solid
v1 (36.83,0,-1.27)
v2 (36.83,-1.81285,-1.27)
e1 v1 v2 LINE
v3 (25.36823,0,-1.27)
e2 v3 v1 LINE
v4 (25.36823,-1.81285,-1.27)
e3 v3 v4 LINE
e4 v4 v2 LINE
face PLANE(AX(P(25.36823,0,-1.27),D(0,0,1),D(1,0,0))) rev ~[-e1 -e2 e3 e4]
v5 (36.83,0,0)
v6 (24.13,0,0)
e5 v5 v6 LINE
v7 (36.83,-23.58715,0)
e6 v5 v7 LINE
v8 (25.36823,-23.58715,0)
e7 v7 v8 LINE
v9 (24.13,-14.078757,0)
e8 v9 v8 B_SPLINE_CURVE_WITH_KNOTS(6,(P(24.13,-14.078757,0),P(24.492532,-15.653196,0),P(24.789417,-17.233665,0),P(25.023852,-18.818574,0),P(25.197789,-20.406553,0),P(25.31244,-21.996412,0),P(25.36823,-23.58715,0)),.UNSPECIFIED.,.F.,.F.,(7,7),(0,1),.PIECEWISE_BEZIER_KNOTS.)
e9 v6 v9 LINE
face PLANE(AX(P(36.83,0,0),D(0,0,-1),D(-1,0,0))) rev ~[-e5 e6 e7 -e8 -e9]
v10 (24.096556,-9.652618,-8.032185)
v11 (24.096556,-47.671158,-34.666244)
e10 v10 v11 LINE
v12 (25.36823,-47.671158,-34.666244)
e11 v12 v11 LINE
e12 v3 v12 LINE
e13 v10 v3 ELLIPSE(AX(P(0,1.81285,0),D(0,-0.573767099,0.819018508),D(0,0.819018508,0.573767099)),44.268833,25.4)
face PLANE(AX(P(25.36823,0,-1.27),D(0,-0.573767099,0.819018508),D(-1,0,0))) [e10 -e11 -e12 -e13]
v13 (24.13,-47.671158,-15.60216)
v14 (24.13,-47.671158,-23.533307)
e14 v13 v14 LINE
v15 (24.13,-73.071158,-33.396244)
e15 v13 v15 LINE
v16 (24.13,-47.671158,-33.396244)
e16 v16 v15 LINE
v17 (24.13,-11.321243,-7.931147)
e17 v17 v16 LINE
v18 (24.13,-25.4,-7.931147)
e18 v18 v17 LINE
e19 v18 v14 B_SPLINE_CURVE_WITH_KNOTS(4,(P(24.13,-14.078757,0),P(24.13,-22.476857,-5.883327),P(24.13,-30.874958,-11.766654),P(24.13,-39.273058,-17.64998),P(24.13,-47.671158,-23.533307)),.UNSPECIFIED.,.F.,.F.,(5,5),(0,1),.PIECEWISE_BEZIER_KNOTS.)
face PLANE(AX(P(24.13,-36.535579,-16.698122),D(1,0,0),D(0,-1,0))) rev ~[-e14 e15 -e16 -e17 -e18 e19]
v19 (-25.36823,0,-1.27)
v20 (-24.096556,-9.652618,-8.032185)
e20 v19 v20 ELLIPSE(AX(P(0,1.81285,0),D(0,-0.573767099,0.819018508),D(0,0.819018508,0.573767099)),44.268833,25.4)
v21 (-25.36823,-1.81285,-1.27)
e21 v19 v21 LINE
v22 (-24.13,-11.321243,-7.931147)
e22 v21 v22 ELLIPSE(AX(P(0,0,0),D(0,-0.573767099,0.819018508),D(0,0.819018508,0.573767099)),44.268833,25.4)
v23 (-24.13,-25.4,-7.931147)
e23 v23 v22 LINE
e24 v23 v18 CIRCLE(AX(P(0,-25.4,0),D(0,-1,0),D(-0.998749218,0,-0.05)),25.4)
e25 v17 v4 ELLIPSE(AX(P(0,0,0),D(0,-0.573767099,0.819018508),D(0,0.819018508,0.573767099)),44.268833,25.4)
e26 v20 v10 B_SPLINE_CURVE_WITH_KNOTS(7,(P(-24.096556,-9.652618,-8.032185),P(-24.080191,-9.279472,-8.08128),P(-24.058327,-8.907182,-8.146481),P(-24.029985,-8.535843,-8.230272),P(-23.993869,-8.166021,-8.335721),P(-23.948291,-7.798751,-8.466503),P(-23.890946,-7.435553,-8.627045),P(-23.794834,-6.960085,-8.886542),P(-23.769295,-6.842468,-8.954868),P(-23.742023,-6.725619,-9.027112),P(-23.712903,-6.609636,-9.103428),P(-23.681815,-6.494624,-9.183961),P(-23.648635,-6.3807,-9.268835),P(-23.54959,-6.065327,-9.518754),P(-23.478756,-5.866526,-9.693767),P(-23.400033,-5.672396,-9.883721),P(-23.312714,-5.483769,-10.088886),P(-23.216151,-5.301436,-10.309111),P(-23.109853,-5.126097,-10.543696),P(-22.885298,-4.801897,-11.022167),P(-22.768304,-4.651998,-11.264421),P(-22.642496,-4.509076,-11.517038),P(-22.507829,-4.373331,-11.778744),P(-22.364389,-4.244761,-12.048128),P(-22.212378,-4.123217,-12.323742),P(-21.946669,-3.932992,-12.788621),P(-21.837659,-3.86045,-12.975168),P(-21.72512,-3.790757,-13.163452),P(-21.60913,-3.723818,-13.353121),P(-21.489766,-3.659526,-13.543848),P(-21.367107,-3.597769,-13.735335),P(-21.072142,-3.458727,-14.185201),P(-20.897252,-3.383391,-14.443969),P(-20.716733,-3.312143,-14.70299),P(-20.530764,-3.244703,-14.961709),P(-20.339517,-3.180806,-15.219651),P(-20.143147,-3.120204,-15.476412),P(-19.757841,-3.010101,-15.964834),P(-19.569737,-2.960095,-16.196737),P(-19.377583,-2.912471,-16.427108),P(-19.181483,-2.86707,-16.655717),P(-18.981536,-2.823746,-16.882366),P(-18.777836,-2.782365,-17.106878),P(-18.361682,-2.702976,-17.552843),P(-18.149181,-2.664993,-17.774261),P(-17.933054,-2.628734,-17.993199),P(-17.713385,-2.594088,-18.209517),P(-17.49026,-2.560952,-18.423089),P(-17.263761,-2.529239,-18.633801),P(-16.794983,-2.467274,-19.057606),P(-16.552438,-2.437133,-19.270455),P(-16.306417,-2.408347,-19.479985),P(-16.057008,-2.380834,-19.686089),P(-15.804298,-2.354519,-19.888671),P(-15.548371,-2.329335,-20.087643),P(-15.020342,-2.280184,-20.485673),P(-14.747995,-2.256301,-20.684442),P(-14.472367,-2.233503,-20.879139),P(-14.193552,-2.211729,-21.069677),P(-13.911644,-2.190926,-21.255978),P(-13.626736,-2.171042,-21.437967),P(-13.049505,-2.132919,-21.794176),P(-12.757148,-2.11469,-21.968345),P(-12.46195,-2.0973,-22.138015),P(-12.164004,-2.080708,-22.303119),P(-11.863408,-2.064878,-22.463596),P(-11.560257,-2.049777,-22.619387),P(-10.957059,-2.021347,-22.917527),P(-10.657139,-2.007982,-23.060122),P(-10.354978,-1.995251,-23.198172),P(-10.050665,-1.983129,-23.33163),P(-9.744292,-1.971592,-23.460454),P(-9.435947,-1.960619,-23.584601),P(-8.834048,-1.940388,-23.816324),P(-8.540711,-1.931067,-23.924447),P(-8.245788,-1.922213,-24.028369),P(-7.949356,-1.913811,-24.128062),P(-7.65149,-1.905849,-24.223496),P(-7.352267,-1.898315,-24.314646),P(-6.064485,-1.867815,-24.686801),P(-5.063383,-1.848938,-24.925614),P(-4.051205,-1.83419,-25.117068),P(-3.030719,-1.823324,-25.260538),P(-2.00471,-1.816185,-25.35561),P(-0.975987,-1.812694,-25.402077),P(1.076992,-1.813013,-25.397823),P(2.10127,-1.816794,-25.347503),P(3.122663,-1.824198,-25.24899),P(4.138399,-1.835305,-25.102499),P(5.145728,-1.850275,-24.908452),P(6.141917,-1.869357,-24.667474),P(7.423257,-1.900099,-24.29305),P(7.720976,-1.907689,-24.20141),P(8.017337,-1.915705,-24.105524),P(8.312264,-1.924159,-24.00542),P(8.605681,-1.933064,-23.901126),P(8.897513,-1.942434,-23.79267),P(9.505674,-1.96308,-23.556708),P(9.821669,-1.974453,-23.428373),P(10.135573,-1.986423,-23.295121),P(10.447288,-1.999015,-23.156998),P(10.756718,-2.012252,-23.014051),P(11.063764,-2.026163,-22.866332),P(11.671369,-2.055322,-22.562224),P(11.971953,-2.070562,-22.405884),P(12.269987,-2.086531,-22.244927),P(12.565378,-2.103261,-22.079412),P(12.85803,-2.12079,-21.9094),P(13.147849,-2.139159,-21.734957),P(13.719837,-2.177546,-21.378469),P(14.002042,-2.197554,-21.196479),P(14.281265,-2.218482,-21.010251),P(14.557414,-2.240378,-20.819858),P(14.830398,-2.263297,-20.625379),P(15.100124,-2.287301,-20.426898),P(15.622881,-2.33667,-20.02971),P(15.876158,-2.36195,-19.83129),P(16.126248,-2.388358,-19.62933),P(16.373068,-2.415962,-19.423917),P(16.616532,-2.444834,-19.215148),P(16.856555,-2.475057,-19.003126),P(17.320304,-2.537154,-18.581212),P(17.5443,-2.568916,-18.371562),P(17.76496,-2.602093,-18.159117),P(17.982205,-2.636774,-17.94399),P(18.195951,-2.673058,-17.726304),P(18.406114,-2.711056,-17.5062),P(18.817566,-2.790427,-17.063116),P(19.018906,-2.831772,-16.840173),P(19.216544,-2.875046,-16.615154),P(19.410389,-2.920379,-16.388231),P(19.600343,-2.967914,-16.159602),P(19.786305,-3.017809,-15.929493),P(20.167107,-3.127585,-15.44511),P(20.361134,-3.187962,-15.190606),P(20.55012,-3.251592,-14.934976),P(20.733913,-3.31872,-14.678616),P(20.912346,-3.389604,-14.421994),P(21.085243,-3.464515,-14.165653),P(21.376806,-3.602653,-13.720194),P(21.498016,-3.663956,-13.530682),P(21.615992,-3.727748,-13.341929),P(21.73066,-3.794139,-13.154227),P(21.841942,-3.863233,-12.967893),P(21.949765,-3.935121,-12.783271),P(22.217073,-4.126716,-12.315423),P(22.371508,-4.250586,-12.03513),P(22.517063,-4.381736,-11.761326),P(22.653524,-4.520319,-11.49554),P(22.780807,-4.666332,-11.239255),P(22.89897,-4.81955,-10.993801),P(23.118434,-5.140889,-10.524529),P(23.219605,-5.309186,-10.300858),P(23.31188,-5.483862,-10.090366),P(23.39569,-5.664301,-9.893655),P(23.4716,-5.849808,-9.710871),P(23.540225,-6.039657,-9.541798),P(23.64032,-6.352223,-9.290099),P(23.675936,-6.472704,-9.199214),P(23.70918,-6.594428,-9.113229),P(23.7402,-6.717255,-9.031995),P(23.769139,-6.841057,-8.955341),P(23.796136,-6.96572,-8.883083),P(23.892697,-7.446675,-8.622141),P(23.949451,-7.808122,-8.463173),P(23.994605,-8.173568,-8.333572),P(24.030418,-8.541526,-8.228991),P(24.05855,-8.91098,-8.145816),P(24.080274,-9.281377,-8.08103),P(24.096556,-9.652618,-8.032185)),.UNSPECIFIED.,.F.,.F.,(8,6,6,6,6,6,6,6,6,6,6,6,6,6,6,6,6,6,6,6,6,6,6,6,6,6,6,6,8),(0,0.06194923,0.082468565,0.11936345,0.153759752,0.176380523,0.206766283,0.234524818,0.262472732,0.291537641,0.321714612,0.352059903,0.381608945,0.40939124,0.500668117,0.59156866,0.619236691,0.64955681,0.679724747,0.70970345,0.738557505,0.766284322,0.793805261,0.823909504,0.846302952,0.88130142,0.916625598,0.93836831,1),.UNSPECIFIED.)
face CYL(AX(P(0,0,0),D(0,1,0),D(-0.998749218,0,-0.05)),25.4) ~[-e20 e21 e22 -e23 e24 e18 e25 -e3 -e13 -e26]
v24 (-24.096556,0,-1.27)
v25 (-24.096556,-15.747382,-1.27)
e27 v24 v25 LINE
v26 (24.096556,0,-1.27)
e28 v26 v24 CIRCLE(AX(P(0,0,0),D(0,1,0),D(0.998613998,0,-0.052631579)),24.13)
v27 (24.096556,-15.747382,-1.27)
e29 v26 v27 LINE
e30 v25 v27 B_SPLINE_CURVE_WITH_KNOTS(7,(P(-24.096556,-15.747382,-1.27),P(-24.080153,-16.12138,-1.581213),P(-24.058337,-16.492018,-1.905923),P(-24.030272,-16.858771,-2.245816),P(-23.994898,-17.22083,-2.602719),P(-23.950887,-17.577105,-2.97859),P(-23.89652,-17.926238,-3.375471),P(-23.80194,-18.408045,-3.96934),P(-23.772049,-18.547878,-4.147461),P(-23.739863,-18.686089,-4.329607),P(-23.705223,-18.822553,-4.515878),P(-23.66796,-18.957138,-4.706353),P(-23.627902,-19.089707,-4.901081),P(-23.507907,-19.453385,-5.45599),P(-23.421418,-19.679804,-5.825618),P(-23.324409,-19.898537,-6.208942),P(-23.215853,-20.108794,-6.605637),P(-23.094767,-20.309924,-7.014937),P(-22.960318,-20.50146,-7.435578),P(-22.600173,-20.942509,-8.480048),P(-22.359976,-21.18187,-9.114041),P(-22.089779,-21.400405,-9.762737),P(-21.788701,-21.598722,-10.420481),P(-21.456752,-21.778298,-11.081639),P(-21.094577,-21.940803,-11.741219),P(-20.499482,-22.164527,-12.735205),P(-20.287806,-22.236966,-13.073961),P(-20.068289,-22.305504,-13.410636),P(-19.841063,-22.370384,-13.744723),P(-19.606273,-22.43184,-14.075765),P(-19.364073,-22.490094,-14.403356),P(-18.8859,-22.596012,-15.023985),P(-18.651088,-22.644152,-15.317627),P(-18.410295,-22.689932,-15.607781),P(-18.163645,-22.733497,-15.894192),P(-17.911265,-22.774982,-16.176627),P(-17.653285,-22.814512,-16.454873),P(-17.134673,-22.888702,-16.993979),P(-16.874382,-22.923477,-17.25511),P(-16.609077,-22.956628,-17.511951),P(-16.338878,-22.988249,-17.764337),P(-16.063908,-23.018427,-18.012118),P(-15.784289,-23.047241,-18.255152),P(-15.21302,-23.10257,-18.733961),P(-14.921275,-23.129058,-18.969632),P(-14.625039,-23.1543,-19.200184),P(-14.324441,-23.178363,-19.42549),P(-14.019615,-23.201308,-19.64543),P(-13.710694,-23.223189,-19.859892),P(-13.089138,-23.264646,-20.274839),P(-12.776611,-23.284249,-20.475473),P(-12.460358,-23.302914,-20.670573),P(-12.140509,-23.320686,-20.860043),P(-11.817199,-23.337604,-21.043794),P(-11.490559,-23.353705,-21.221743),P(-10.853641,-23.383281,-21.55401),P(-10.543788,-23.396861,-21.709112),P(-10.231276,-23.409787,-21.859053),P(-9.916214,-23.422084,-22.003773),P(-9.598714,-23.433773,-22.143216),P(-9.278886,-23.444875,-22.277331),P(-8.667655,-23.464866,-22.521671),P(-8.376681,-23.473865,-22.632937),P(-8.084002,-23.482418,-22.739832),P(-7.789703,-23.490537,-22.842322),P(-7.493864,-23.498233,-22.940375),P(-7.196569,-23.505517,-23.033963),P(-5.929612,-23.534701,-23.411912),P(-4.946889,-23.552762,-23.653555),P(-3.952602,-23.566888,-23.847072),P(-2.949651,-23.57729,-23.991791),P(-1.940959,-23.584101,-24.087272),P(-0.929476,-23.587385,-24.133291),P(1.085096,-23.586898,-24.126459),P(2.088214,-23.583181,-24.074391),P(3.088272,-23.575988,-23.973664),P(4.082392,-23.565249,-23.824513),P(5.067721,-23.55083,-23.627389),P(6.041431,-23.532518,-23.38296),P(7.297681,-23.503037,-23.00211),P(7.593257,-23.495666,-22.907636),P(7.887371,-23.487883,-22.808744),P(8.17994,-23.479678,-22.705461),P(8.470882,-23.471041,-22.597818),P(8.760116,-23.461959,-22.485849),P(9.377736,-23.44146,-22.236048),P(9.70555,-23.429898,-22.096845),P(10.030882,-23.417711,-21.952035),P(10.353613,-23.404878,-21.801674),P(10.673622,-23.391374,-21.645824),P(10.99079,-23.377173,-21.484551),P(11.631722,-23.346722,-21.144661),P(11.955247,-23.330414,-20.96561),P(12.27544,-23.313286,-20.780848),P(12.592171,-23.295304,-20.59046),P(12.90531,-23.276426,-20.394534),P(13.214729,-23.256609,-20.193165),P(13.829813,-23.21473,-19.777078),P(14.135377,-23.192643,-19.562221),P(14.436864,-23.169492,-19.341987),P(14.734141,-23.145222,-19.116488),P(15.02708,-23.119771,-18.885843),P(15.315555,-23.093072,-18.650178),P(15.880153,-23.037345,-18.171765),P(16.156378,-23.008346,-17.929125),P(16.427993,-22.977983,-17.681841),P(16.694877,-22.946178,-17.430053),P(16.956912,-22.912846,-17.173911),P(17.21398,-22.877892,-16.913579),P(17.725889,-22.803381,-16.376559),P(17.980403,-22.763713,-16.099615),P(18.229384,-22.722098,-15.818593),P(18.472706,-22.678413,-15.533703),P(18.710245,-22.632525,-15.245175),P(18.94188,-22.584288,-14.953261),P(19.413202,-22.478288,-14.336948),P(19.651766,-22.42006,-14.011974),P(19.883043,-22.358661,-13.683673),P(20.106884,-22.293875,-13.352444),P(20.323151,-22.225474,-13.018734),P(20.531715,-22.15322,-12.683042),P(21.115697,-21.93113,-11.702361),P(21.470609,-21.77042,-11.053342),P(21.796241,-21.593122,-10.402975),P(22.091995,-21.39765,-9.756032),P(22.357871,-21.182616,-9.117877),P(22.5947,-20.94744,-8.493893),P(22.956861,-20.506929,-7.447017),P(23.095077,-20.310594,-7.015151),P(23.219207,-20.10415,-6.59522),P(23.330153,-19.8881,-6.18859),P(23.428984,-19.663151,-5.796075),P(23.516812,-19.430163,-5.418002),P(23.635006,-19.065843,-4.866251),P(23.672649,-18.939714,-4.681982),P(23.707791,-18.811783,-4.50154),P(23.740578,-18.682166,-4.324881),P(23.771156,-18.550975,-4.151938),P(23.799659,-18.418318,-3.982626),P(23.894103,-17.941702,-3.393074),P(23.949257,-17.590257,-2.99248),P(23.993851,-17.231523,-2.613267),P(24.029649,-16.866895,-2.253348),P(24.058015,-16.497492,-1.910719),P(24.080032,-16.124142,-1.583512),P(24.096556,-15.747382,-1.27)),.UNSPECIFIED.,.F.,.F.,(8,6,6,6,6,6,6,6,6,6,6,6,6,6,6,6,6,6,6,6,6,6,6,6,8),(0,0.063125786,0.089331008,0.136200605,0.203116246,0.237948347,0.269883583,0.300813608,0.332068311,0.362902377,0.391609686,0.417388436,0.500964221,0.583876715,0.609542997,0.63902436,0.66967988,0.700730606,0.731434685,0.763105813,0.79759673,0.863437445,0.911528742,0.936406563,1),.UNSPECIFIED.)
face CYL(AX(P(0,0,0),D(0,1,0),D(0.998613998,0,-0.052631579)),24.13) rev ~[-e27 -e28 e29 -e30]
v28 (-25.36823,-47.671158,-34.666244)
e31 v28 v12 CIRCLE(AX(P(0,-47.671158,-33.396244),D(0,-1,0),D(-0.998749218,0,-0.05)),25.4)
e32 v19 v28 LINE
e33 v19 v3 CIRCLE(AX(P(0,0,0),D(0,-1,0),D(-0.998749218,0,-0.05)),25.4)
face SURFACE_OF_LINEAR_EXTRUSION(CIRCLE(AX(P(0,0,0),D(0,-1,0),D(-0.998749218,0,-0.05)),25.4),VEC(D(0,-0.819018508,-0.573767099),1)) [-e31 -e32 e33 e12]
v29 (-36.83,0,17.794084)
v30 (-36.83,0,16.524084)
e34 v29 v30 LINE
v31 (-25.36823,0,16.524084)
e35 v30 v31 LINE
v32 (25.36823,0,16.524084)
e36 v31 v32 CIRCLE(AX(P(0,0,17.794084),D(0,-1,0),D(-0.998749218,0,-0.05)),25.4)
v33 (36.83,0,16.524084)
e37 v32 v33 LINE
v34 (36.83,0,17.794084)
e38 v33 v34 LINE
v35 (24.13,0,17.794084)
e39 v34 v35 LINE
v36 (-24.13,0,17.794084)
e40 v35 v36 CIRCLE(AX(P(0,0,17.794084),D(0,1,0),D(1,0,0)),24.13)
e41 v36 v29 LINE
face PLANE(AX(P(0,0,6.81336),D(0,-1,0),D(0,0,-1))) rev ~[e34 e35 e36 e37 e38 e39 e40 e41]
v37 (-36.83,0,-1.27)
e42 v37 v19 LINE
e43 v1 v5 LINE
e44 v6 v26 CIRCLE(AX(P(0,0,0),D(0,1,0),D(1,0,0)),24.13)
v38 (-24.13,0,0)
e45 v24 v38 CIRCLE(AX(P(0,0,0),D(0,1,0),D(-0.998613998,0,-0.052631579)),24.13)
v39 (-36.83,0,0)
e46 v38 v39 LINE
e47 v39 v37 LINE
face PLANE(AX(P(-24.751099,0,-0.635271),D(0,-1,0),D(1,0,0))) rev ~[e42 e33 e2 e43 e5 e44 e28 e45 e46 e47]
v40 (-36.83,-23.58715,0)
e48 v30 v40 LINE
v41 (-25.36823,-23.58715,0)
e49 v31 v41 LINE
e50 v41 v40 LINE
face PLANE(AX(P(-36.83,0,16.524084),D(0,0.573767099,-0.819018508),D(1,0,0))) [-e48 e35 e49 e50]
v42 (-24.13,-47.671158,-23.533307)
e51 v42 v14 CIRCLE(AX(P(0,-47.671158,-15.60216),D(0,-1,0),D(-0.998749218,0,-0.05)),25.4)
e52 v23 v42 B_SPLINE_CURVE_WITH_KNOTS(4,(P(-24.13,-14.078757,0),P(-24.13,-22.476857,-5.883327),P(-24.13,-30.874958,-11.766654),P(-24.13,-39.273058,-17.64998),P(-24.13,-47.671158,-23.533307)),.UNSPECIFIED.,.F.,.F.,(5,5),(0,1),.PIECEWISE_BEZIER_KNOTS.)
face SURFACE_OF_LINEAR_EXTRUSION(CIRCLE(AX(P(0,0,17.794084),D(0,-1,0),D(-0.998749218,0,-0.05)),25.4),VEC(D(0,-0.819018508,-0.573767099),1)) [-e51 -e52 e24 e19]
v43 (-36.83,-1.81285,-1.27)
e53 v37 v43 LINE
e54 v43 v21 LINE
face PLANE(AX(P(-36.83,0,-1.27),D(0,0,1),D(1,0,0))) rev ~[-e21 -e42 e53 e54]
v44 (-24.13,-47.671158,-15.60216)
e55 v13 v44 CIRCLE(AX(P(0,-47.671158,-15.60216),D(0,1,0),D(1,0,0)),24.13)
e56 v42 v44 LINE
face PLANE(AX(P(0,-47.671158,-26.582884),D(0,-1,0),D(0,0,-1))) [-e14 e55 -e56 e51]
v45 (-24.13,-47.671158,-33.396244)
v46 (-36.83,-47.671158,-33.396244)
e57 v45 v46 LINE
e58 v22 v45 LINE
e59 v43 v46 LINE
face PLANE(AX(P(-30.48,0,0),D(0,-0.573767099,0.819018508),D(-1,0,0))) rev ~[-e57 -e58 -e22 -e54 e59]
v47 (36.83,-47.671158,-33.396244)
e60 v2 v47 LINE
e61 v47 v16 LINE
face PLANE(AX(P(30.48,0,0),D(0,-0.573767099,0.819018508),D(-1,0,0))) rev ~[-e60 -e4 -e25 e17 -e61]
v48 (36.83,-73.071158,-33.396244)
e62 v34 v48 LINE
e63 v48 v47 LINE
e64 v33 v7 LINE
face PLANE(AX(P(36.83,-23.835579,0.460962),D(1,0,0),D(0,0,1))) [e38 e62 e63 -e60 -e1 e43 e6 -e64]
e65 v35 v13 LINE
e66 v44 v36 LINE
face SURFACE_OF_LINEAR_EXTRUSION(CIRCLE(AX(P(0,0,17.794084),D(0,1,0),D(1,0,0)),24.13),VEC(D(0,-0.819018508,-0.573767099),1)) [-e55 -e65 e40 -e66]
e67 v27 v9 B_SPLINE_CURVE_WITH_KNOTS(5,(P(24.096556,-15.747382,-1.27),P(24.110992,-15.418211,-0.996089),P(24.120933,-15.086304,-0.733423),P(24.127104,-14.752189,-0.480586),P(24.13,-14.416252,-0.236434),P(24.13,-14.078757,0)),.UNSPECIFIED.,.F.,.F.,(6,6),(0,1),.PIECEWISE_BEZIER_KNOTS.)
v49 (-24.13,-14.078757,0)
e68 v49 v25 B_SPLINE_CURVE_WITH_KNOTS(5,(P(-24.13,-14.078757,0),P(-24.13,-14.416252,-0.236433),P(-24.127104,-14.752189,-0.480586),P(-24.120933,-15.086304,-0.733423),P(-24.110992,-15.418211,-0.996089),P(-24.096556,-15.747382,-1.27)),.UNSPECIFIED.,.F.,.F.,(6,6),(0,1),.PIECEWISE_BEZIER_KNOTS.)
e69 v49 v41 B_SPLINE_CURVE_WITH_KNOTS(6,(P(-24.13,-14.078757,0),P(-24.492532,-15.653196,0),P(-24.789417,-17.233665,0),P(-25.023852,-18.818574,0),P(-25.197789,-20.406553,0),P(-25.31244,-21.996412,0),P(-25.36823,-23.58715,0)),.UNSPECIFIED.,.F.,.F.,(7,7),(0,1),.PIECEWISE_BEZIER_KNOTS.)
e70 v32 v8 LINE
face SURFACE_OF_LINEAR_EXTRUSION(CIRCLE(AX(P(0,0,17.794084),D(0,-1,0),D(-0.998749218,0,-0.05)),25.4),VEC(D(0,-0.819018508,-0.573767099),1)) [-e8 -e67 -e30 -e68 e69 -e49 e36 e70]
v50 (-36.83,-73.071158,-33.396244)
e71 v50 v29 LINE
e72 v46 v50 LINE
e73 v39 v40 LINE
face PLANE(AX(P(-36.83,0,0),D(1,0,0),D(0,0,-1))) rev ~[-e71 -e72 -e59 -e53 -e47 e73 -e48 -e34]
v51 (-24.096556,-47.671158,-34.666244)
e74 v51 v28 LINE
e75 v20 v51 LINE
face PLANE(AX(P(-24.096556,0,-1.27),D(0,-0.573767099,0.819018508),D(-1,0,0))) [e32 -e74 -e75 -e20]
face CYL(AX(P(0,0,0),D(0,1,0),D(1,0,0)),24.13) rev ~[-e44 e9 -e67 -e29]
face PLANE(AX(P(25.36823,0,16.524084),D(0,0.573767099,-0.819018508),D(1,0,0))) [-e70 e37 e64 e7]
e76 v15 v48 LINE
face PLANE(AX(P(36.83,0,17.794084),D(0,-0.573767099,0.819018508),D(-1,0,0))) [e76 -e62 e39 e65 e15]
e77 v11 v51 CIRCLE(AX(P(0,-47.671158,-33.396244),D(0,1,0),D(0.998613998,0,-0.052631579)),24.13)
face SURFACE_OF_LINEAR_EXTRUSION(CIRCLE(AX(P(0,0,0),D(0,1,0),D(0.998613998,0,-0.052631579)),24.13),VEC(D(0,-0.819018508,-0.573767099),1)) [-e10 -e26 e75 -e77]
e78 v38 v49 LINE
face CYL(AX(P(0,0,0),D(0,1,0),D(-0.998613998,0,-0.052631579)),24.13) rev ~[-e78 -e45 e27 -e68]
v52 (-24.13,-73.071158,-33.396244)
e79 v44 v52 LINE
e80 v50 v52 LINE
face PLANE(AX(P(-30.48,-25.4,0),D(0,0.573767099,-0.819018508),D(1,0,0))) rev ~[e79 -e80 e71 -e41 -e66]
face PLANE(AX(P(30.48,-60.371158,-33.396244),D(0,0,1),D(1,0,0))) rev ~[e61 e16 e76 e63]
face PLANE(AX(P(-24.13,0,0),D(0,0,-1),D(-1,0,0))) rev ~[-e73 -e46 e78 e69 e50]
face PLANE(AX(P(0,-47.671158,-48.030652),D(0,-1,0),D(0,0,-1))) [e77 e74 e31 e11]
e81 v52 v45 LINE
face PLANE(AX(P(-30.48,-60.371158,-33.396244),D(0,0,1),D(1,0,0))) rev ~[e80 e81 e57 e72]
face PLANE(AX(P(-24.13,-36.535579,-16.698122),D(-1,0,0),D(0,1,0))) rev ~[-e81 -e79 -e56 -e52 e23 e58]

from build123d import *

# Parameters (mm, degrees)
F1_DEPTH  = 25.4
F1_FACE_W = 12.7
F1_FACE_H = 25.4


with BuildPart() as f1:
    # F0 (on Front) → F1 (new body)
    with BuildSketch(Plane.XZ):
        with BuildLine():
            Line((-24.13, 0), (-25.4, 0))
            ThreePointArc((-25.4, 0), (-25.3920562907, -0.6351986549), (-25.3682301314, -1.27))
            Line((-25.3682301314, -1.27), (-24.0965557705, -1.27))
            ThreePointArc((-24.0965557705, -1.27), (-24.1216374936, -0.6352201423), (-24.13, 0))
        make_face()
        with BuildLine():
            ThreePointArc((-25.3682301314, -1.27), (-25.3920562907, -0.6351986549), (-25.4, 0))
            Line((-25.4, 0), (-36.83, 0))
            Line((-36.83, 0), (-36.83, -1.27))
            Line((-36.83, -1.27), (-25.3682301314, -1.27))
        make_face()
        with BuildLine():
            Line((-24.0965557705, -1.27), (-25.3682301314, -1.27))
            ThreePointArc((-25.3682301314, -1.27), (0, -25.4), (25.3682301314, -1.27))
            Line((25.3682301314, -1.27), (24.0965557705, -1.27))
            ThreePointArc((24.0965557705, -1.27), (0, -24.13), (-24.0965557705, -1.27))
        make_face()
        with BuildLine():
            Line((24.0965557705, -1.27), (25.3682301314, -1.27))
            ThreePointArc((25.3682301314, -1.27), (25.3920562907, -0.6351986549), (25.4, 0))
            Line((25.4, 0), (24.13, 0))
            ThreePointArc((24.13, 0), (24.1216374936, -0.6352201423), (24.0965557705, -1.27))
        make_face()
        with BuildLine():
            ThreePointArc((25.4, 0), (25.3920562907, -0.6351986549), (25.3682301314, -1.27))
            Line((25.3682301314, -1.27), (36.83, -1.27))
            Line((36.83, -1.27), (36.83, 0))
            Line((36.83, 0), (25.4, 0))
        make_face()
    extrude(amount=F1_DEPTH)

    # F3: sweep along a path in F2
    with BuildLine(Plane.YZ) as f3_path:
        Line((0, 0), (-47.6711578667, -33.3962440491))
    # F1_face (on face) + F1_face1 (on face) + F0 (on Front) → F3 (sweep)
    with BuildSketch(Plane(origin=(-30.48, -12.7, 0), x_dir=(1, 0, 0), z_dir=(0, 0, 1))):
        Rectangle(F1_FACE_W, F1_FACE_H)
        with Locations((60.96, 0)):
            Rectangle(F1_FACE_W, F1_FACE_H)
    with BuildSketch(Plane(origin=(1e-10, -25.4, -12.329976557), x_dir=(1, 0, 0), z_dir=(0, -1, 0))):
        with BuildLine():
            Line((-24.1300000001, 12.329976557), (-36.8300000001, 12.329976557))
            Line((-36.8300000001, 12.329976557), (-36.8300000001, 11.059976557))
            Line((-36.8300000001, 11.059976557), (-25.3682301315, 11.059976557))
            ThreePointArc((-25.3682301315, 11.059976557), (-1e-10, -13.070023443), (25.3682301313, 11.059976557))
            Line((25.3682301313, 11.059976557), (36.8299999999, 11.059976557))
            Line((36.8299999999, 11.059976557), (36.8299999999, 12.329976557))
            Line((36.8299999999, 12.329976557), (24.1299999999, 12.329976557))
            ThreePointArc((24.1299999999, 12.329976557), (-1e-10, -11.8000234431), (-24.1300000001, 12.329976557))
        make_face()
    with BuildSketch(Plane.XZ):
        with BuildLine():
            Line((-24.0965557705, -1.27), (-25.3682301314, -1.27))
            ThreePointArc((-25.3682301314, -1.27), (0, -25.4), (25.3682301314, -1.27))
            Line((25.3682301314, -1.27), (24.0965557705, -1.27))
            ThreePointArc((24.0965557705, -1.27), (0, -24.13), (-24.0965557705, -1.27))
        make_face()
    sweep(path=f3_path.line)


solid = f1.part
